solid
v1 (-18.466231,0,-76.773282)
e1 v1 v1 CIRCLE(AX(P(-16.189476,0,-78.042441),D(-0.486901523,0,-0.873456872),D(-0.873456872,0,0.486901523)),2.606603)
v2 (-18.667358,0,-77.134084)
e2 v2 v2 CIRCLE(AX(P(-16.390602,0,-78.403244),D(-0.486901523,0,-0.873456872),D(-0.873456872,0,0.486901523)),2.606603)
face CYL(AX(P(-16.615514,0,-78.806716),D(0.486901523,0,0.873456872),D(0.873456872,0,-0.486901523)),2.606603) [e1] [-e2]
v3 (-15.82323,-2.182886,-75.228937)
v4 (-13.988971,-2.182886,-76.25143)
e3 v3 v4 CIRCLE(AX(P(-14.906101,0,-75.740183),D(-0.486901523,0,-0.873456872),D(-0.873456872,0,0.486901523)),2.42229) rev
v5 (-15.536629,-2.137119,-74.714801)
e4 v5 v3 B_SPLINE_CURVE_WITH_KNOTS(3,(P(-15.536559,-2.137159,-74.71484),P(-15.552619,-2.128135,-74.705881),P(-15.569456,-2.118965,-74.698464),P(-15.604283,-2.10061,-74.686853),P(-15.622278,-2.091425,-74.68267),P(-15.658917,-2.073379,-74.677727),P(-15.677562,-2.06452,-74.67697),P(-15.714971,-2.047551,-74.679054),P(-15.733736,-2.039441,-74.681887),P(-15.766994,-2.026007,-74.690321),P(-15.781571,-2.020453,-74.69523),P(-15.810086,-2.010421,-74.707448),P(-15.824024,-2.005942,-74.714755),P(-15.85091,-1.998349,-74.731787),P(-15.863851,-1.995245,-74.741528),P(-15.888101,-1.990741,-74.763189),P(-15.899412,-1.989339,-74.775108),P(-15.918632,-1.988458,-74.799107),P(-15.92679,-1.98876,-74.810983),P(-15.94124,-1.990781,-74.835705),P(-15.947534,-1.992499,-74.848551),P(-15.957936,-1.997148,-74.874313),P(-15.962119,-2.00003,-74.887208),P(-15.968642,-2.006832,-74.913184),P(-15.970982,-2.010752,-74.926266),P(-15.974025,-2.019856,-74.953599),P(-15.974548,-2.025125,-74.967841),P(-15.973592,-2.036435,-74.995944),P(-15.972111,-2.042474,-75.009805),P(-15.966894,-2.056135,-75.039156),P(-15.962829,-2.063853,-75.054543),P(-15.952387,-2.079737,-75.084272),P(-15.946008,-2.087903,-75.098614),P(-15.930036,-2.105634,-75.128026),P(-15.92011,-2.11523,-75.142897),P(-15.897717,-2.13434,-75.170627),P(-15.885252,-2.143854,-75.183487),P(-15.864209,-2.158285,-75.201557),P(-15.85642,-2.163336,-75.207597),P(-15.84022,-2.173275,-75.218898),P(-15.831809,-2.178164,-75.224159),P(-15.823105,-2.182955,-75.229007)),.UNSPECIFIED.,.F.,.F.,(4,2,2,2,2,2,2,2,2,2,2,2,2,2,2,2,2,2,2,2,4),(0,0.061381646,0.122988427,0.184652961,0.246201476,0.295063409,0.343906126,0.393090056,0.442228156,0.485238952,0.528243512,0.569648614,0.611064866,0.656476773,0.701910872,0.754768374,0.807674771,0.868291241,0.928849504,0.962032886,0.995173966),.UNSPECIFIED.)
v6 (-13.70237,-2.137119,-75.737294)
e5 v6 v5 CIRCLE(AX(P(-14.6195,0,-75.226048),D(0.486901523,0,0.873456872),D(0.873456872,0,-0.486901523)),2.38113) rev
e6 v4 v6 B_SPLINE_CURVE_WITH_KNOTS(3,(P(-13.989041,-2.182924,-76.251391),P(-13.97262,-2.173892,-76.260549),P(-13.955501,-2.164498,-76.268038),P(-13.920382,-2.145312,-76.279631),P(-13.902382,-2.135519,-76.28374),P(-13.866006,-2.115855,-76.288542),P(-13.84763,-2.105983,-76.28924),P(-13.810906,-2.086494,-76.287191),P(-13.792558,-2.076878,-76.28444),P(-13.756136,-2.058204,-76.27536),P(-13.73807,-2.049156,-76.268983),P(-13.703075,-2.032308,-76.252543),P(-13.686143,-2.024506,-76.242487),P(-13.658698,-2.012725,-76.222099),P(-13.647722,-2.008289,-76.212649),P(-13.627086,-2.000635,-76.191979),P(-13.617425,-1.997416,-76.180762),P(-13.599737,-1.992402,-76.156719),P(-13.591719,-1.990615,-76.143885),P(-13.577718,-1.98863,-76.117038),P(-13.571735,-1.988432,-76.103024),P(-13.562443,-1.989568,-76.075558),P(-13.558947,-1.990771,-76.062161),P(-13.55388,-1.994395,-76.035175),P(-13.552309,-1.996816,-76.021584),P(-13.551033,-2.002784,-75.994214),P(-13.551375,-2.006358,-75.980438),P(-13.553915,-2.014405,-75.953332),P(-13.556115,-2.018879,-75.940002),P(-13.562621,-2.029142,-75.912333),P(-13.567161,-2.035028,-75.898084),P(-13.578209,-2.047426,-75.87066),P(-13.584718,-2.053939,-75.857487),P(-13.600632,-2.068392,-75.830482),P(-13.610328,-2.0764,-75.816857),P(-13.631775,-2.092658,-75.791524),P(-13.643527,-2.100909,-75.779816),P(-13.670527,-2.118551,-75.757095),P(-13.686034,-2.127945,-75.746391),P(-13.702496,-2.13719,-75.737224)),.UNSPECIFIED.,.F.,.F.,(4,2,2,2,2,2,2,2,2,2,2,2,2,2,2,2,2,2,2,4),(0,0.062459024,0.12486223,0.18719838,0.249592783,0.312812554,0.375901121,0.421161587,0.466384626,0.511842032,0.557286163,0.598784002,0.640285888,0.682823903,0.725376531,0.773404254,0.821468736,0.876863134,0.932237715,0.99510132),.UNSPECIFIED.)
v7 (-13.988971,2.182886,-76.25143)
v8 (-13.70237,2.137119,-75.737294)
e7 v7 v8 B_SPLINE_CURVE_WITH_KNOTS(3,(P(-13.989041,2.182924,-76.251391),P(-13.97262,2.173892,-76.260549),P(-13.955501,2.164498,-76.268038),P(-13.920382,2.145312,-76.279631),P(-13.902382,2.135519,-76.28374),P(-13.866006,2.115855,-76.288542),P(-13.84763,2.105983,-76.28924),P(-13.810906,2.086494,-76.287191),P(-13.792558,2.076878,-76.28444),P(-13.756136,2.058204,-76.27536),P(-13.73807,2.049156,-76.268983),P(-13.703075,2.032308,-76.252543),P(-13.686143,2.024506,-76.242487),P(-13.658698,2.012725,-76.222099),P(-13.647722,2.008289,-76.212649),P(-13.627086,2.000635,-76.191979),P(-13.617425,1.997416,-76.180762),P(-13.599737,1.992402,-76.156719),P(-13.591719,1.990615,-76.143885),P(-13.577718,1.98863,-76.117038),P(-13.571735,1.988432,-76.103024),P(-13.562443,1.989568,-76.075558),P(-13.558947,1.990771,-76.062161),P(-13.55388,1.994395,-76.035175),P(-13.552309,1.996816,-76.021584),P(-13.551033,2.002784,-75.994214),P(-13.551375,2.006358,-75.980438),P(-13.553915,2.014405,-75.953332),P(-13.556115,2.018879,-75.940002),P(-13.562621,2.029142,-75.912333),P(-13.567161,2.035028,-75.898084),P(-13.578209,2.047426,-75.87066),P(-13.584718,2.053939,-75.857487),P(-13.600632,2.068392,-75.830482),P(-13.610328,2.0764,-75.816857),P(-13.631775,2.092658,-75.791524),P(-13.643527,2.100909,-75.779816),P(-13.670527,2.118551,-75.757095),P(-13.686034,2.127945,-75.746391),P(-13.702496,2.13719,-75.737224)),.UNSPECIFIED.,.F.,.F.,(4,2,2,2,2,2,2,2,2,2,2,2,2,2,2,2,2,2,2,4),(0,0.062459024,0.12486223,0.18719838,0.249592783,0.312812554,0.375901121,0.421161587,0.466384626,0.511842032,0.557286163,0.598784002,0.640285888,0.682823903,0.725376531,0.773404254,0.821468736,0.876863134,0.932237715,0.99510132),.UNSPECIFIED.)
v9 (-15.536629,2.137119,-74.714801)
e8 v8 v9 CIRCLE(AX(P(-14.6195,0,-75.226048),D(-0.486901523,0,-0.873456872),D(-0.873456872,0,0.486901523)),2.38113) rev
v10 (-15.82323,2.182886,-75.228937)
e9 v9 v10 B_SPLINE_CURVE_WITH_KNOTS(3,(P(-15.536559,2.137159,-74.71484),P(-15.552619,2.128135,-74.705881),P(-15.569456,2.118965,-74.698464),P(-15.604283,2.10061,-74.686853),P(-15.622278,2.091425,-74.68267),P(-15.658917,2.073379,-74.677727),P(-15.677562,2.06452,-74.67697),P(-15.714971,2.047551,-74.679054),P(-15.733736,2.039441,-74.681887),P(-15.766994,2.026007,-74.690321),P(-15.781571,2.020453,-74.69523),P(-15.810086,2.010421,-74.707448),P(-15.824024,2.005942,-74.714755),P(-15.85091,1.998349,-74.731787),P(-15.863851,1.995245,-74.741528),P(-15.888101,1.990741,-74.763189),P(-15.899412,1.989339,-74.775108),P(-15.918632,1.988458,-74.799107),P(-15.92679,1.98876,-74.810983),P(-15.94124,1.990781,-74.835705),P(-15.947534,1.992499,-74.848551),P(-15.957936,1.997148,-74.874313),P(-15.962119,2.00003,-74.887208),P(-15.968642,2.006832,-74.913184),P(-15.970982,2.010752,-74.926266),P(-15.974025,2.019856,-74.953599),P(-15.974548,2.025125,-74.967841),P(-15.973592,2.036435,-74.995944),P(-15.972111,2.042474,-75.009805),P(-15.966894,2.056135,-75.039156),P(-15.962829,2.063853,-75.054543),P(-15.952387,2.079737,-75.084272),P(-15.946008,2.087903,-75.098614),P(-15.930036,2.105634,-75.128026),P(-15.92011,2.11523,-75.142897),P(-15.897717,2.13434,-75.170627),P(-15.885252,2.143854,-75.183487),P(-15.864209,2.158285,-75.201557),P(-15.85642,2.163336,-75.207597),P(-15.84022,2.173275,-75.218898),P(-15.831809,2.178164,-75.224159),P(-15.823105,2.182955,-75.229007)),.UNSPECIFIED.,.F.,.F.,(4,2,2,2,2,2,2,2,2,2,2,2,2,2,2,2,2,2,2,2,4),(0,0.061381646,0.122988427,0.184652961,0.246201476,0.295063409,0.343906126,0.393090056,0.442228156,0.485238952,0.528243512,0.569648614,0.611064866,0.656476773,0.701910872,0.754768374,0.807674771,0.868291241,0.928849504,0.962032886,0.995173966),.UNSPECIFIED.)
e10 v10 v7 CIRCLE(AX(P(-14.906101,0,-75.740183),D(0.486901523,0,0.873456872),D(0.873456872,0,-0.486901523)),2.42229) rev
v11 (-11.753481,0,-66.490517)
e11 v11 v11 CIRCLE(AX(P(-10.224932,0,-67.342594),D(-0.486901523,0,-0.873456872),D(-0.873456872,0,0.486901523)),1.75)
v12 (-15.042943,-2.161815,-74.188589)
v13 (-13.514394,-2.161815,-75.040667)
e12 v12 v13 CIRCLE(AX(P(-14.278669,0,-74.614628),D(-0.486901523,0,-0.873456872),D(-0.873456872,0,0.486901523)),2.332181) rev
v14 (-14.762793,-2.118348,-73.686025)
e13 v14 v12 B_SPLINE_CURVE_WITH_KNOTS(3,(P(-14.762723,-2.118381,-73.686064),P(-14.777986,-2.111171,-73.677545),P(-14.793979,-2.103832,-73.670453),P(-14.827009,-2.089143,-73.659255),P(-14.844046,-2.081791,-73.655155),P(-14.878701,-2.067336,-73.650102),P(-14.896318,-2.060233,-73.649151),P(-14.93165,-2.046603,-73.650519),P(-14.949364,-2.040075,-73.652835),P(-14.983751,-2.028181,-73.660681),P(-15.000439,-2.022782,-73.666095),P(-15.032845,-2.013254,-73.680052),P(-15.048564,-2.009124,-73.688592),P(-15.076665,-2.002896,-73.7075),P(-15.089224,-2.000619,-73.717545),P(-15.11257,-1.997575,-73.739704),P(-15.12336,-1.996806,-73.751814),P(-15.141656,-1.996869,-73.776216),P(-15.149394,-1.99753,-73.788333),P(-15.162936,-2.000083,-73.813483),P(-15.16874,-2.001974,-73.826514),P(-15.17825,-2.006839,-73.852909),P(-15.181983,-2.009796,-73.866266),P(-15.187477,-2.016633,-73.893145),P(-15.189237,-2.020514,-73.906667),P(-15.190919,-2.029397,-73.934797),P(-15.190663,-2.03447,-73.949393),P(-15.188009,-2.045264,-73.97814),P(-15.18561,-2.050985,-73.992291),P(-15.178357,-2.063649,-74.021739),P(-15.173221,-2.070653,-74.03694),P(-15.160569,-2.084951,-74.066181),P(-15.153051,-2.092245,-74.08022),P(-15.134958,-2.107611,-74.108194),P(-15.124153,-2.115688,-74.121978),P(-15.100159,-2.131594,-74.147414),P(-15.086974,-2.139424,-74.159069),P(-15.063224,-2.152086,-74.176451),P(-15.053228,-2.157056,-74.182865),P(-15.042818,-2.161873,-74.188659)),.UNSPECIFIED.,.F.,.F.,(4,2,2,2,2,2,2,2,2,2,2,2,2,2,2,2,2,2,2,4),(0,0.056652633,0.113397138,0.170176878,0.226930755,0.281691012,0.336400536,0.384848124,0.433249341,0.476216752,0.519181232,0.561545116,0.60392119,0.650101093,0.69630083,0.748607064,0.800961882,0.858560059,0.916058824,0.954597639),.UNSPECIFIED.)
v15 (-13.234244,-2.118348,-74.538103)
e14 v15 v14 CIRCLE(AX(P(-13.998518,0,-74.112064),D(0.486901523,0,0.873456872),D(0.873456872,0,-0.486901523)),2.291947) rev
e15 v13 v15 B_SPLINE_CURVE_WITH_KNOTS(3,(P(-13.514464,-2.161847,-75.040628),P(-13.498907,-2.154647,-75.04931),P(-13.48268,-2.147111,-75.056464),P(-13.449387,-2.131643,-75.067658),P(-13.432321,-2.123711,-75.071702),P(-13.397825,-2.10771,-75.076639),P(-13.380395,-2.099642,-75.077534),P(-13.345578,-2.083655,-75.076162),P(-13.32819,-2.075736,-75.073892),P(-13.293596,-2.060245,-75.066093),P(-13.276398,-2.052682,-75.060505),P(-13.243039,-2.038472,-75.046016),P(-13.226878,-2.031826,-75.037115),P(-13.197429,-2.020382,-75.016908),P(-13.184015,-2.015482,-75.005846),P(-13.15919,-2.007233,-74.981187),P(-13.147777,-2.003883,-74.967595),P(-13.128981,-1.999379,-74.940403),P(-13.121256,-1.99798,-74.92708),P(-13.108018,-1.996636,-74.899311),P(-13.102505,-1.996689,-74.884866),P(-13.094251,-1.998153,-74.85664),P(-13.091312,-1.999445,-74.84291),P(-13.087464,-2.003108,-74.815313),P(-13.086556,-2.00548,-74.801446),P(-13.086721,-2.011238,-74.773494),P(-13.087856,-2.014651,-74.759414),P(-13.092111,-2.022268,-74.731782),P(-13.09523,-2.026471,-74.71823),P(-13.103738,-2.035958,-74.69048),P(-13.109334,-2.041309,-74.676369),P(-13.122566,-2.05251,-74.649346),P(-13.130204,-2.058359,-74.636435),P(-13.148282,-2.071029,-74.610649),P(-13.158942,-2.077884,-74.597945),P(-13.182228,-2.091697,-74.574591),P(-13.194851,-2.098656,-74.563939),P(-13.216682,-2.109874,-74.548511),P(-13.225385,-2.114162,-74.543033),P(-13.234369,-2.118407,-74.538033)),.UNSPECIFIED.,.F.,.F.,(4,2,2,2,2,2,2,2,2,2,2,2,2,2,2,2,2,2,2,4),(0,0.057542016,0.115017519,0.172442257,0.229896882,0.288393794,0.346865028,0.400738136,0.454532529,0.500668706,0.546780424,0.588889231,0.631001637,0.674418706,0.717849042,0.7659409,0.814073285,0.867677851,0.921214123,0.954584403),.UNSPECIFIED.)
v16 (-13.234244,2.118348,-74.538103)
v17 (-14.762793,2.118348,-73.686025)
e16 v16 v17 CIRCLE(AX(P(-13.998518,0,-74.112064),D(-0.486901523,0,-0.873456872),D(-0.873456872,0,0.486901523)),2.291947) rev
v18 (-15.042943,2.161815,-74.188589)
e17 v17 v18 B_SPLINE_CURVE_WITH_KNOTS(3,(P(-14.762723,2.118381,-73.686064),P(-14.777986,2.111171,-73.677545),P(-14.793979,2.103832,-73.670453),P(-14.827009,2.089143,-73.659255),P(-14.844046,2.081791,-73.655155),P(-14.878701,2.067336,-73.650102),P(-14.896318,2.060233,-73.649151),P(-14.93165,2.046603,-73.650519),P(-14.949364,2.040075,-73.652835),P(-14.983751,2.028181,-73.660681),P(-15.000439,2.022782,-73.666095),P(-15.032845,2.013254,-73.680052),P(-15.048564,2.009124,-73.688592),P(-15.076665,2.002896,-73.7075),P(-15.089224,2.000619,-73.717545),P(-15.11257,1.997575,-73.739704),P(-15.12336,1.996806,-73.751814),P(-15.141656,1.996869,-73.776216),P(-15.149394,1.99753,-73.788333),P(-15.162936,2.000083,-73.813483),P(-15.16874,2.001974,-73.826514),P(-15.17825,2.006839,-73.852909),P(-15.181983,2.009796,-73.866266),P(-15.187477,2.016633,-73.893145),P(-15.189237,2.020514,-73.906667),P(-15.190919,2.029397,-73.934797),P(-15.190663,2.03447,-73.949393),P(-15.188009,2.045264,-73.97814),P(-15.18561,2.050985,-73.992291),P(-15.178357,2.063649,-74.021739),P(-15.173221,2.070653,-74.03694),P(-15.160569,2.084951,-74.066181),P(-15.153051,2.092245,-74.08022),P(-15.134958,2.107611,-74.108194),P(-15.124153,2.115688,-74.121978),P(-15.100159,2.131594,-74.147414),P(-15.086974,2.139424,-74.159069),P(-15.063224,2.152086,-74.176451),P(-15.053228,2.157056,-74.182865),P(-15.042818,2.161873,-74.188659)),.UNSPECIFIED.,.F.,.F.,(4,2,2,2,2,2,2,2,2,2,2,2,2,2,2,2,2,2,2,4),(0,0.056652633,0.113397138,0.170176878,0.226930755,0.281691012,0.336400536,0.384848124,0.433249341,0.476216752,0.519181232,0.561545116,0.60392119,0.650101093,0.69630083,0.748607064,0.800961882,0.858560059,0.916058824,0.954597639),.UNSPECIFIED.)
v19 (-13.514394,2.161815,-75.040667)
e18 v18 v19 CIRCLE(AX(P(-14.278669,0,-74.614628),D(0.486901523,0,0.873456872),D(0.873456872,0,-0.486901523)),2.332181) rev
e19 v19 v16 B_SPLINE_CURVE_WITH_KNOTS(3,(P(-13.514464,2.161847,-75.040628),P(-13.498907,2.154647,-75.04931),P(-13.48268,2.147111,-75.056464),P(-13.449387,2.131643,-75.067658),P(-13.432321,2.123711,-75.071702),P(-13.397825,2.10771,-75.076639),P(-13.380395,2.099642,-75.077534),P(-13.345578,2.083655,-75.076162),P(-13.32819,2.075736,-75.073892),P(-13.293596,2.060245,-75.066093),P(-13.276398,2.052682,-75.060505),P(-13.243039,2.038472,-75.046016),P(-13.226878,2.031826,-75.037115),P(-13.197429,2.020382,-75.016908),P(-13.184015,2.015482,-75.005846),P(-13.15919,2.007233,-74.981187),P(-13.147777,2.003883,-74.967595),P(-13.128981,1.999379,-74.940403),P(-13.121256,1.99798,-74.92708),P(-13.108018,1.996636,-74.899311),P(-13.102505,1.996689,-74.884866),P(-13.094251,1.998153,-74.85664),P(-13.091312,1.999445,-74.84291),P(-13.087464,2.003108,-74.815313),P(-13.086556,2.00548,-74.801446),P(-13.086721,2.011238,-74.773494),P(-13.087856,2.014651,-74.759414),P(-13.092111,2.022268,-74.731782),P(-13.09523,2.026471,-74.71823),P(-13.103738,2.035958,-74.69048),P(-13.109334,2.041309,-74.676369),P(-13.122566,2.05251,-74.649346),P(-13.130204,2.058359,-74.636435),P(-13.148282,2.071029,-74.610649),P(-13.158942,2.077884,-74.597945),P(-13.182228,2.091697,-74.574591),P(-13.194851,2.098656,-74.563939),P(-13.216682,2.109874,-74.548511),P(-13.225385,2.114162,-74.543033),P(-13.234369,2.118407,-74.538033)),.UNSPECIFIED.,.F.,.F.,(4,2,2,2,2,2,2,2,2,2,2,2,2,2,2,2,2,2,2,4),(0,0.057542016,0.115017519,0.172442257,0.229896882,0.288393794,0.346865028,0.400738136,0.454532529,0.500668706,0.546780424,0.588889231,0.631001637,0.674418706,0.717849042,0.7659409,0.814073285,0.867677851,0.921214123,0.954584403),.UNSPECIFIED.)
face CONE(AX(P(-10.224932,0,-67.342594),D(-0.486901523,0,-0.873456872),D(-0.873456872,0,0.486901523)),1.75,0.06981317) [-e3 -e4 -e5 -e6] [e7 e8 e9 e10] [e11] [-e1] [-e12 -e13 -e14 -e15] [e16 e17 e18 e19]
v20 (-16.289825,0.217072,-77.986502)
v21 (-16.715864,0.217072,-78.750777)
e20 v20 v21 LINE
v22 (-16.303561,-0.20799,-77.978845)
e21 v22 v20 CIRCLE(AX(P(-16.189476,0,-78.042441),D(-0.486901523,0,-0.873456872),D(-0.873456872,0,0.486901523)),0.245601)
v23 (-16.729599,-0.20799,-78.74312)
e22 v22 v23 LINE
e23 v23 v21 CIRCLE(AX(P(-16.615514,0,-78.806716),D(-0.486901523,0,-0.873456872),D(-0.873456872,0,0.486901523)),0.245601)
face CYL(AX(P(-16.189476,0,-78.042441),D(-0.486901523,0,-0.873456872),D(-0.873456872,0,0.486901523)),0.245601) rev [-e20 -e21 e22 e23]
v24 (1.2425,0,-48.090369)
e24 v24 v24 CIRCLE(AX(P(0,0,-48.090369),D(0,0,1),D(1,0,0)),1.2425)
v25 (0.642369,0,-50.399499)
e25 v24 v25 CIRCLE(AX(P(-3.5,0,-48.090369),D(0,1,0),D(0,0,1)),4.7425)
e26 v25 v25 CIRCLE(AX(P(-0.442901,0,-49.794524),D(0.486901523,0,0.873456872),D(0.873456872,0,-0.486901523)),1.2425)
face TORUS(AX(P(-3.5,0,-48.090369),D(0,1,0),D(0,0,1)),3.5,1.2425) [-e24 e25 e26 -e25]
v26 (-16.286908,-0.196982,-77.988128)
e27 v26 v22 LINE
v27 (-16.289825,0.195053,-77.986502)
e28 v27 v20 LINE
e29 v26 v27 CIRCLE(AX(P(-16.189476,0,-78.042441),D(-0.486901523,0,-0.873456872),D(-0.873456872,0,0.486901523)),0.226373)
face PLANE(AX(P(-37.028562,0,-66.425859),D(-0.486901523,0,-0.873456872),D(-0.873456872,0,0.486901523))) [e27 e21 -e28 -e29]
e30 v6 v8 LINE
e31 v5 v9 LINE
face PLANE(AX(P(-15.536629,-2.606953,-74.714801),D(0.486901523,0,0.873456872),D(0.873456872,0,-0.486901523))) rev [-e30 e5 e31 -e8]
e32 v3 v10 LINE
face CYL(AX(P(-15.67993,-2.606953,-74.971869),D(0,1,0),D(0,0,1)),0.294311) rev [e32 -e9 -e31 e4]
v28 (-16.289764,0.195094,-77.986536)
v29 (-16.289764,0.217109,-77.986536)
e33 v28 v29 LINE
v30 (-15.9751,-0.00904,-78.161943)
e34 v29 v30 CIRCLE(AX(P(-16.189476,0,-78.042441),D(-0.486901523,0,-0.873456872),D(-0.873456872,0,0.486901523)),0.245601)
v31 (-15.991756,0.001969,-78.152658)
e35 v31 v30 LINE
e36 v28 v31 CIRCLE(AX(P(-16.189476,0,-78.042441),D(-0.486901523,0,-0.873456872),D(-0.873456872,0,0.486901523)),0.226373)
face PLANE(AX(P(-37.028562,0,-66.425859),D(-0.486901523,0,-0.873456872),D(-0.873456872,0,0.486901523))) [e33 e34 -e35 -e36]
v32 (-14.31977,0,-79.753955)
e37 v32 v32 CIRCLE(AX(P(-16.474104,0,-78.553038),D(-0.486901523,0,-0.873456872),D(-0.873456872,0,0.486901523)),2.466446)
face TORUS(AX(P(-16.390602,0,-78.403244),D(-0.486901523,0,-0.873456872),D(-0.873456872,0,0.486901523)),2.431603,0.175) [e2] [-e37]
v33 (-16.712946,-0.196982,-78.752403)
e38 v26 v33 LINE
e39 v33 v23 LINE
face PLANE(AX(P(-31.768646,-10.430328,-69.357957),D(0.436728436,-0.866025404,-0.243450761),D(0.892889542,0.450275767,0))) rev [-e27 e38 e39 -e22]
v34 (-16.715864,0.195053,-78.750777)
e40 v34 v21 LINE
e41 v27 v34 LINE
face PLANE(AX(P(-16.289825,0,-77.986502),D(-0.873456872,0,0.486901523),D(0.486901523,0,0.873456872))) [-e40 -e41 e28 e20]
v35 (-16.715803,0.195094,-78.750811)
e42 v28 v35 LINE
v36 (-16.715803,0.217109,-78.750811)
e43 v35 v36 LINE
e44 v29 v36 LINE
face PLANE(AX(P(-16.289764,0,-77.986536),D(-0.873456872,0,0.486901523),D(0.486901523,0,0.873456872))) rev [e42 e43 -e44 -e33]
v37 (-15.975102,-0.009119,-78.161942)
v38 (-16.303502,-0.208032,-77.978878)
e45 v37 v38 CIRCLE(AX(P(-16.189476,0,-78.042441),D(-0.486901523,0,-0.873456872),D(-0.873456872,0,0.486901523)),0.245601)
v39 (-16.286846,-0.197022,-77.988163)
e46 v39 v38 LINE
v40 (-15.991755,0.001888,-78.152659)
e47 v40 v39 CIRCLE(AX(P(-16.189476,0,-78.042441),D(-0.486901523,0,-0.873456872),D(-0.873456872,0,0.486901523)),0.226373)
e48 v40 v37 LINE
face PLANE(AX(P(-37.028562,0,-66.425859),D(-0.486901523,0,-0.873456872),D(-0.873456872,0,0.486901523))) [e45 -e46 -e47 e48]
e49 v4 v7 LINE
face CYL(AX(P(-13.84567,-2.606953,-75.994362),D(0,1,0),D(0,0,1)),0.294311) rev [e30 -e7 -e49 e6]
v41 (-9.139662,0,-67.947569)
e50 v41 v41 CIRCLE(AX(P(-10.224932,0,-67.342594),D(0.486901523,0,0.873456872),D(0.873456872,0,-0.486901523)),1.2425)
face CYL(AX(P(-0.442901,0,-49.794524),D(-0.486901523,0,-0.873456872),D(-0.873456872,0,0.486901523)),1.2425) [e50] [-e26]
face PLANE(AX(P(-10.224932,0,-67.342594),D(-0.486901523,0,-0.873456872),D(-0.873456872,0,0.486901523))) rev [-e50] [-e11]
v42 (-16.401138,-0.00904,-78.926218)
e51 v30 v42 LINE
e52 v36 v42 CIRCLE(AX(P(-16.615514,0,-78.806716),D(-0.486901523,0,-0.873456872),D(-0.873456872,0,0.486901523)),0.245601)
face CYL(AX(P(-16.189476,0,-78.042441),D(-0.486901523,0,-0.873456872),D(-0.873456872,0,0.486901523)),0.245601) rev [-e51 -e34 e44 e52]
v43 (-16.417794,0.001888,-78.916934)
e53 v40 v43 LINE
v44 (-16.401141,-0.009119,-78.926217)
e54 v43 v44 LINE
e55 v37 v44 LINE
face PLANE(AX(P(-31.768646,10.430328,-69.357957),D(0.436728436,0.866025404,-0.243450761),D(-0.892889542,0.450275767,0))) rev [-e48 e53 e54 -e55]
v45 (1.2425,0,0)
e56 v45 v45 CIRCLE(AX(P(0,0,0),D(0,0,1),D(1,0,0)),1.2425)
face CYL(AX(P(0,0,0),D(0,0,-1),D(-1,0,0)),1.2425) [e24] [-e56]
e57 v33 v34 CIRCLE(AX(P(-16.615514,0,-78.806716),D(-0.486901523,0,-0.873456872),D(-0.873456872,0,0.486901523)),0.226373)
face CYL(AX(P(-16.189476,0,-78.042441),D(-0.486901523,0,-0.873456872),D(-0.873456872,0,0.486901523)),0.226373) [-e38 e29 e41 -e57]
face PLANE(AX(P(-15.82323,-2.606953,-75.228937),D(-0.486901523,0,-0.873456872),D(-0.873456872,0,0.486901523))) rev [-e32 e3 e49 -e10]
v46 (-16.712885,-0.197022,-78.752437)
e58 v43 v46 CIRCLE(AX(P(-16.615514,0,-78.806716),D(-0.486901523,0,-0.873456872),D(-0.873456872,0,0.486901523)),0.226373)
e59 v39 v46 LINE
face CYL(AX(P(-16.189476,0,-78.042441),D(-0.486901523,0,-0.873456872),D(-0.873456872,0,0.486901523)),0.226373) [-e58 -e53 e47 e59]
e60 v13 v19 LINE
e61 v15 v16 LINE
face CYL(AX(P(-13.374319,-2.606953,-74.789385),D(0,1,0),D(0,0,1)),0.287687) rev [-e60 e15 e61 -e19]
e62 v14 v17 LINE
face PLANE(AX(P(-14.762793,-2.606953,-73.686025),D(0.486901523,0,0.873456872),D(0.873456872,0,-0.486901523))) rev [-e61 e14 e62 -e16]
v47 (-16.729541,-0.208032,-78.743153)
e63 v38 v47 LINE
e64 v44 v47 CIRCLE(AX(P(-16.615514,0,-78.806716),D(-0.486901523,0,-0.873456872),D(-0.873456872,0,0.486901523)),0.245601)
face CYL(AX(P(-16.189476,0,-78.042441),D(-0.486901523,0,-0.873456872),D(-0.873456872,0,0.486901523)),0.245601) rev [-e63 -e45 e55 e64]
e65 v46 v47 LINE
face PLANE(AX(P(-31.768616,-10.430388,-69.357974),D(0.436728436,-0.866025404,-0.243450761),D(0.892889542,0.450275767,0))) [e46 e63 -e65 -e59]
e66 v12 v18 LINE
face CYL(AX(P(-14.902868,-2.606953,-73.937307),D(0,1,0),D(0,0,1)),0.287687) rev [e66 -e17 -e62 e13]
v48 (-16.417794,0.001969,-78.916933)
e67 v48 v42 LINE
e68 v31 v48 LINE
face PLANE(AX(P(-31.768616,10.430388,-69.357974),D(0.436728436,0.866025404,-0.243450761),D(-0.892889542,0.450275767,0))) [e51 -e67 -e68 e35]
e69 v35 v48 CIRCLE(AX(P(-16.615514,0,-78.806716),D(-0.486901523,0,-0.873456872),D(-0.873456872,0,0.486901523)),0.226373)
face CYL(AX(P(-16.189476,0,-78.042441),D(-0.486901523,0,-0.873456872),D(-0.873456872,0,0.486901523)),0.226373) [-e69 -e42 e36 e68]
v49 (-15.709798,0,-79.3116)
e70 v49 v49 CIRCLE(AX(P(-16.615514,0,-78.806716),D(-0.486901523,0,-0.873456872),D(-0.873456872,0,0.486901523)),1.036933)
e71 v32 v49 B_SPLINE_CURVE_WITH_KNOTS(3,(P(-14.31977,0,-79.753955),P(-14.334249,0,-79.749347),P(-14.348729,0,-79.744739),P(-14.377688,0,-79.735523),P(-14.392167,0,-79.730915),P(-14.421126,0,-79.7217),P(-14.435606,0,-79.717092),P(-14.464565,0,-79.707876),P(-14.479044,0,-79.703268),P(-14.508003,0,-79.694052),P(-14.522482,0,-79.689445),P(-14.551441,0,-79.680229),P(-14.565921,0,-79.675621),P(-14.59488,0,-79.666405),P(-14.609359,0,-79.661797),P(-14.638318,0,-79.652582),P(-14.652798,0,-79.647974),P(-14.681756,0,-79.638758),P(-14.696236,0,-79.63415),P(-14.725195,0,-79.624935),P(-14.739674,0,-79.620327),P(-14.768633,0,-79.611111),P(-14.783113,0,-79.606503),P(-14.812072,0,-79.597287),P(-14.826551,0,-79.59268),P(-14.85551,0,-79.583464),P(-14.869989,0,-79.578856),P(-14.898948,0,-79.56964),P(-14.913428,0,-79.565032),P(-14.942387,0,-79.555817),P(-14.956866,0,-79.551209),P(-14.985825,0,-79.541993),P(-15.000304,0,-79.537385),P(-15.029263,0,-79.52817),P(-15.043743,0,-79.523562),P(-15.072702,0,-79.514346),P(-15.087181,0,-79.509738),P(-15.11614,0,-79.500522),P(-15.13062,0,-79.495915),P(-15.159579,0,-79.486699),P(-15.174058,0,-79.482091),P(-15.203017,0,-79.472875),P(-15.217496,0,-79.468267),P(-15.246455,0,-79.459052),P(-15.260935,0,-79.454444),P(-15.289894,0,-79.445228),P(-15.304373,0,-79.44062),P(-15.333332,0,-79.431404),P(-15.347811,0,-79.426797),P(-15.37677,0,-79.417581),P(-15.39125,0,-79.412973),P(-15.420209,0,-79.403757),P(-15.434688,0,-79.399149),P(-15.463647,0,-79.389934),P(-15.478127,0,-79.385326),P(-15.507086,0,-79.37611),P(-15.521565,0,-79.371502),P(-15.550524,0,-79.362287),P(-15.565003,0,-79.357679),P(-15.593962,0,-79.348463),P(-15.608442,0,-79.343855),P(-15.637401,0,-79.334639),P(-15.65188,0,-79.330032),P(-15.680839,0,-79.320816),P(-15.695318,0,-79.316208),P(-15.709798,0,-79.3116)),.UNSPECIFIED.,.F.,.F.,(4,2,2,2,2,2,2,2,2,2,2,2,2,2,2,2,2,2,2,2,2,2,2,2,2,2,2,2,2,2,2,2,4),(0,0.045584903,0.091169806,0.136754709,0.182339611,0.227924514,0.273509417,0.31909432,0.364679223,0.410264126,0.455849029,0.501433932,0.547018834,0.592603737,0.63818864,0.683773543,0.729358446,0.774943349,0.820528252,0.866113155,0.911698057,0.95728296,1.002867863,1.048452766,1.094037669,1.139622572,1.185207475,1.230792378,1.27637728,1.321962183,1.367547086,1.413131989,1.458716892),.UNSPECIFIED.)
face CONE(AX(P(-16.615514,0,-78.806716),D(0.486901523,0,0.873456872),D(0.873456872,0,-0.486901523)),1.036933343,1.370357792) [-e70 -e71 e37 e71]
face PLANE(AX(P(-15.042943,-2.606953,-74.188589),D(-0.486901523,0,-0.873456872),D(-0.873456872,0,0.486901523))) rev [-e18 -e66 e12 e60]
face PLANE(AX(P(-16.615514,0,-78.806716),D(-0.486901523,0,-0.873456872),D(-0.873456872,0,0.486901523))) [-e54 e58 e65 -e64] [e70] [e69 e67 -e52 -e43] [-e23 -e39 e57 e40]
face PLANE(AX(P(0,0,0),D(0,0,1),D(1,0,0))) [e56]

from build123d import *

# Parameters (mm, degrees)
IZIM1_R                           = 3.55
IZIM3_R                           = 5
Y_KSEKLIK_EKSTR_ZYON1_DEPTH       = 35
Y_KSEKLIK_EKSTR_ZYON1_DRAFT       = -4
KES_EKSTR_ZYON1_REACH             = 234.785
KES_EKSTR_ZYON1_DIRECTION_2_REACH = 234.785
IZIM5_R                           = 7.447438418
Y_KSEKLIK_EKSTR_ZYON2_DEPTH       = 2.5
KES_EKSTR_ZYON2_START             = -2.5
KES_EKSTR_ZYON2_DEPTH             = 2.5
SCALE1_SCALE                      = 0.35


# Read off the part's stored shape, not the designer's step: Kes-Ekstrüzyon2
with BuildPart() as part:
    # Süpür1: sweep along a path in Çizim2
    with BuildLine(Plane(origin=(0, 0, 0), x_dir=(1, 0, 0), z_dir=(0, 1, 0))) as s_p_r1_path:
        Line((0, 0), (0, 137.401052942))
        ThreePointArc((0, 137.401052942), (-0.321526794, 139.916436889), (-1.265431279, 142.270068168))
        Line((-1.265431279, 142.270068168), (-29.214091353, 192.407412323))
    # Çizim1 → Süpür1 (sweep)
    with BuildSketch(Plane.XY):
        Circle(IZIM1_R)
    sweep(path=s_p_r1_path.line)


with BuildPart() as y_kseklik_ekstr_zyon1_tool:
    # Çizim3 → Yükseklik-Ekstrüzyon1 (with draft: the straight prism first)
    with BuildSketch(Plane(origin=(-88.754338678, 0, -159.21717935), x_dir=(-0.8734568720516385, 0, 0.48690152255437436), z_dir=(-0.48690152255437436, 0, -0.8734568720516385))):
        with Locations((-68.166213158, 0)):
            Circle(IZIM3_R)
    extrude(amount=Y_KSEKLIK_EKSTR_ZYON1_DEPTH)
    # Yükseklik-Ekstrüzyon1: the draft: its side faces are tilted about the plane it starts from
    y_kseklik_ekstr_zyon1_sides = [y_kseklik_ekstr_zyon1_tool.faces().sort_by_distance(p)[0] for p in [
        (-33.367583638, 0, -210.127415197),
    ]]
    draft(y_kseklik_ekstr_zyon1_sides, Plane(origin=(-88.754338678, 0, -159.21717935), x_dir=(-0.8734568720516385, 0, 0.48690152255437436), z_dir=(-0.48690152255437436, 0, -0.8734568720516385)), Y_KSEKLIK_EKSTR_ZYON1_DRAFT)


with BuildPart() as part_1:
    add(part.part)

    # Yükseklik-Ekstrüzyon1: add y_kseklik_ekstr_zyon1_tool
    add(y_kseklik_ekstr_zyon1_tool.part)

    # Kes-Ekstrüzyon1: up to this cone (the profile starts inside it)
    kes_ekstr_zyon1_end = Plane(origin=(-41.287705224, 0, -214.066373154), z_dir=(-0.48690152255437436, 0, -0.8734568720516385)).offset(-96.300159439) * Cone(1e-06, 23.785643459, 340.150547806, align=(Align.CENTER, Align.CENTER, Align.MIN), mode=Mode.PRIVATE)
    # Çizim4 → Kes-Ekstrüzyon1 (cut, up to the surface)
    with BuildSketch(Plane(origin=(0, 0, 0), x_dir=(1, 0, 0), z_dir=(0, 1, 0)), mode=Mode.PRIVATE) as kes_ekstr_zyon1_sk1:
        with BuildLine():
            Line((-45.209229303, 214.939819091), (-39.968488071, 217.861228226))
            ThreePointArc((-39.968488071, 217.861228226), (-38.824578975, 217.536178458), (-39.149628743, 216.392269362))
            Line((-39.149628743, 216.392269362), (-44.390369975, 213.470860227))
            ThreePointArc((-44.390369975, 213.470860227), (-45.534279071, 213.795909995), (-45.209229303, 214.939819091))
        make_face()
    kes_ekstr_zyon1_tool1 = extrude(kes_ekstr_zyon1_sk1.sketch, amount=-KES_EKSTR_ZYON1_REACH, mode=Mode.PRIVATE) & kes_ekstr_zyon1_end
    add(kes_ekstr_zyon1_tool1.solids().sort_by_distance((-42.179429, 0, -215.666044))[0], mode=Mode.SUBTRACT)
    # Çizim4 → Kes-Ekstrüzyon1 (cut, up to the surface)
    with BuildSketch(Plane(origin=(0, 0, 0), x_dir=(1, 0, 0), z_dir=(0, 1, 0)), mode=Mode.PRIVATE) as kes_ekstr_zyon1_sk2:
        with BuildLine():
            Line((-42.979838494, 211.967397244), (-38.612554134, 214.401904857))
            ThreePointArc((-38.612554134, 214.401904857), (-37.494390623, 214.084170877), (-37.812124603, 212.966007366))
            Line((-37.812124603, 212.966007366), (-42.179408963, 210.531499753))
            ThreePointArc((-42.179408963, 210.531499753), (-43.297572474, 210.849233733), (-42.979838494, 211.967397244))
        make_face()
    kes_ekstr_zyon1_tool2 = extrude(kes_ekstr_zyon1_sk2.sketch, amount=-KES_EKSTR_ZYON1_REACH, mode=Mode.PRIVATE) & kes_ekstr_zyon1_end
    add(kes_ekstr_zyon1_tool2.solids().sort_by_distance((-40.395982, 0, -212.466702))[0], mode=Mode.SUBTRACT)

    # Kes-Ekstrüzyon1 direction 2: up to this cone (the profile starts inside it)
    kes_ekstr_zyon1_direction_2_end = Plane(origin=(-41.287705224, 0, -214.066373154), z_dir=(-0.48690152255437436, 0, -0.8734568720516385)).offset(-96.300159439) * Cone(1e-06, 23.785643459, 340.150547806, align=(Align.CENTER, Align.CENTER, Align.MIN), mode=Mode.PRIVATE)
    # Çizim4 → Kes-Ekstrüzyon1 direction 2 (cut, up to the surface)
    with BuildSketch(Plane(origin=(0, 0, 0), x_dir=(1, 0, 0), z_dir=(0, 1, 0)), mode=Mode.PRIVATE) as kes_ekstr_zyon1_direction_2_sk1:
        with BuildLine():
            Line((-45.209229303, 214.939819091), (-39.968488071, 217.861228226))
            ThreePointArc((-39.968488071, 217.861228226), (-38.824578975, 217.536178458), (-39.149628743, 216.392269362))
            Line((-39.149628743, 216.392269362), (-44.390369975, 213.470860227))
            ThreePointArc((-44.390369975, 213.470860227), (-45.534279071, 213.795909995), (-45.209229303, 214.939819091))
        make_face()
    kes_ekstr_zyon1_direction_2_tool1 = extrude(kes_ekstr_zyon1_direction_2_sk1.sketch, amount=KES_EKSTR_ZYON1_DIRECTION_2_REACH, mode=Mode.PRIVATE) & kes_ekstr_zyon1_direction_2_end
    add(kes_ekstr_zyon1_direction_2_tool1.solids().sort_by_distance((-42.179429, 0, -215.666044))[0], mode=Mode.SUBTRACT)
    # Çizim4 → Kes-Ekstrüzyon1 direction 2 (cut, up to the surface)
    with BuildSketch(Plane(origin=(0, 0, 0), x_dir=(1, 0, 0), z_dir=(0, 1, 0)), mode=Mode.PRIVATE) as kes_ekstr_zyon1_direction_2_sk2:
        with BuildLine():
            Line((-42.979838494, 211.967397244), (-38.612554134, 214.401904857))
            ThreePointArc((-38.612554134, 214.401904857), (-37.494390623, 214.084170877), (-37.812124603, 212.966007366))
            Line((-37.812124603, 212.966007366), (-42.179408963, 210.531499753))
            ThreePointArc((-42.179408963, 210.531499753), (-43.297572474, 210.849233733), (-42.979838494, 211.967397244))
        make_face()
    kes_ekstr_zyon1_direction_2_tool2 = extrude(kes_ekstr_zyon1_direction_2_sk2.sketch, amount=KES_EKSTR_ZYON1_DIRECTION_2_REACH, mode=Mode.PRIVATE) & kes_ekstr_zyon1_direction_2_end
    add(kes_ekstr_zyon1_direction_2_tool2.solids().sort_by_distance((-40.395982, 0, -212.466702))[0], mode=Mode.SUBTRACT)

    # Çizim5 → Yükseklik-Ekstrüzyon2 (add)
    with BuildSketch(Plane(origin=(-105.795891967, 0, -189.788169872), x_dir=(-0.8734568720516382, 0, 0.4869015225543744), z_dir=(-0.4869015225543744, 0, -0.8734568720516382))):
        with Locations((-68.166213158, 0)):
            Circle(IZIM5_R)
    extrude(amount=Y_KSEKLIK_EKSTR_ZYON2_DEPTH)

    # Çizim6 → Kes-Döndür1 (revolve, cut)
    with BuildSketch(Plane(origin=(0, 0, 0), x_dir=(1, 0, 0), z_dir=(0, 1, 0)), mode=Mode.PRIVATE) as kes_d_nd_r1_sk:
        with BuildLine():
            Line((-39.750628377, 226.60457195), (-40.325275653, 227.635436692))
            ThreePointArc((-40.325275653, 227.635436692), (-40.577901157, 227.856858074), (-40.91362857, 227.868441612))
            Line((-40.91362857, 227.868441612), (-44.885136864, 226.60457195))
            Line((-44.885136864, 226.60457195), (-47.472898449, 225.162045025))
            Line((-47.472898449, 225.162045025), (-47.961241176, 226.038087286))
            Line((-47.961241176, 226.038087286), (-40.325275653, 230.294694977))
            Line((-40.325275653, 230.294694977), (-38.62051319, 227.236506781))
            Line((-38.62051319, 227.236506781), (-39.750628377, 226.60457195))
        make_face()
    revolve(kes_d_nd_r1_sk.sketch.rotate(Axis((-47.472898449, 0, -225.162045025), (0.4869015225543754, 0, 0.8734568720516378)), 180), axis=Axis((-47.472898449, 0, -225.162045025), (0.4869015225543754, 0, 0.8734568720516378)), mode=Mode.SUBTRACT)

    # Kes-Ekstrüzyon2 outline → Kes-Ekstrüzyon2 (cut)
    with BuildSketch(Plane(origin=(-107.013145773, 0, -191.971812052), x_dir=(-0.8734568720516384, 0, 0.4869015225543744), z_dir=(-0.4869015225543744, 0, -0.8734568720516384)).offset(KES_EKSTR_ZYON2_START)):
        with BuildLine():
            ThreePointArc((-67.837962268, 0.557294858), (-67.519455213, -0.005510565), (-67.847505862, -0.562807129))
            Line((-67.847505862, -0.562807129), (-67.793032927, -0.594257092))
            ThreePointArc((-67.793032927, -0.594257092), (-67.464977128, 0.025942373), (-67.837962268, 0.620206683))
            Line((-67.837962268, 0.620206683), (-67.837962268, 0.557294858))
        make_face()
        with BuildLine():
            ThreePointArc((-67.847707098, -0.562921038), (-68.494364419, -0.557353528), (-68.812972077, 0.00539495))
            Line((-68.812972077, 0.00539495), (-68.867445011, -0.026055013))
            ThreePointArc((-68.867445011, -0.026055013), (-68.494364418, -0.620259403), (-67.793223859, -0.594376951))
            Line((-67.793223859, -0.594376951), (-67.847707098, -0.562921038))
        make_face()
        with BuildLine():
            ThreePointArc((-68.812970107, 0.00562618), (-68.484819841, 0.562864093), (-67.838161534, 0.557412179))
            Line((-67.838161534, 0.557412179), (-67.838161534, 0.620312106))
            ThreePointArc((-67.838161534, 0.620312106), (-68.539297927, 0.594317029), (-68.867453346, -0.025829733))
            Line((-68.867453346, -0.025829733), (-68.812970107, 0.00562618))
        make_face()
    extrude(amount=KES_EKSTR_ZYON2_DEPTH, mode=Mode.SUBTRACT)


with BuildPart() as part_2:
    # Scale1: scaled about (0, 0, 0)
    add(part_1.part.scale(SCALE1_SCALE))


solid = part_2.part
